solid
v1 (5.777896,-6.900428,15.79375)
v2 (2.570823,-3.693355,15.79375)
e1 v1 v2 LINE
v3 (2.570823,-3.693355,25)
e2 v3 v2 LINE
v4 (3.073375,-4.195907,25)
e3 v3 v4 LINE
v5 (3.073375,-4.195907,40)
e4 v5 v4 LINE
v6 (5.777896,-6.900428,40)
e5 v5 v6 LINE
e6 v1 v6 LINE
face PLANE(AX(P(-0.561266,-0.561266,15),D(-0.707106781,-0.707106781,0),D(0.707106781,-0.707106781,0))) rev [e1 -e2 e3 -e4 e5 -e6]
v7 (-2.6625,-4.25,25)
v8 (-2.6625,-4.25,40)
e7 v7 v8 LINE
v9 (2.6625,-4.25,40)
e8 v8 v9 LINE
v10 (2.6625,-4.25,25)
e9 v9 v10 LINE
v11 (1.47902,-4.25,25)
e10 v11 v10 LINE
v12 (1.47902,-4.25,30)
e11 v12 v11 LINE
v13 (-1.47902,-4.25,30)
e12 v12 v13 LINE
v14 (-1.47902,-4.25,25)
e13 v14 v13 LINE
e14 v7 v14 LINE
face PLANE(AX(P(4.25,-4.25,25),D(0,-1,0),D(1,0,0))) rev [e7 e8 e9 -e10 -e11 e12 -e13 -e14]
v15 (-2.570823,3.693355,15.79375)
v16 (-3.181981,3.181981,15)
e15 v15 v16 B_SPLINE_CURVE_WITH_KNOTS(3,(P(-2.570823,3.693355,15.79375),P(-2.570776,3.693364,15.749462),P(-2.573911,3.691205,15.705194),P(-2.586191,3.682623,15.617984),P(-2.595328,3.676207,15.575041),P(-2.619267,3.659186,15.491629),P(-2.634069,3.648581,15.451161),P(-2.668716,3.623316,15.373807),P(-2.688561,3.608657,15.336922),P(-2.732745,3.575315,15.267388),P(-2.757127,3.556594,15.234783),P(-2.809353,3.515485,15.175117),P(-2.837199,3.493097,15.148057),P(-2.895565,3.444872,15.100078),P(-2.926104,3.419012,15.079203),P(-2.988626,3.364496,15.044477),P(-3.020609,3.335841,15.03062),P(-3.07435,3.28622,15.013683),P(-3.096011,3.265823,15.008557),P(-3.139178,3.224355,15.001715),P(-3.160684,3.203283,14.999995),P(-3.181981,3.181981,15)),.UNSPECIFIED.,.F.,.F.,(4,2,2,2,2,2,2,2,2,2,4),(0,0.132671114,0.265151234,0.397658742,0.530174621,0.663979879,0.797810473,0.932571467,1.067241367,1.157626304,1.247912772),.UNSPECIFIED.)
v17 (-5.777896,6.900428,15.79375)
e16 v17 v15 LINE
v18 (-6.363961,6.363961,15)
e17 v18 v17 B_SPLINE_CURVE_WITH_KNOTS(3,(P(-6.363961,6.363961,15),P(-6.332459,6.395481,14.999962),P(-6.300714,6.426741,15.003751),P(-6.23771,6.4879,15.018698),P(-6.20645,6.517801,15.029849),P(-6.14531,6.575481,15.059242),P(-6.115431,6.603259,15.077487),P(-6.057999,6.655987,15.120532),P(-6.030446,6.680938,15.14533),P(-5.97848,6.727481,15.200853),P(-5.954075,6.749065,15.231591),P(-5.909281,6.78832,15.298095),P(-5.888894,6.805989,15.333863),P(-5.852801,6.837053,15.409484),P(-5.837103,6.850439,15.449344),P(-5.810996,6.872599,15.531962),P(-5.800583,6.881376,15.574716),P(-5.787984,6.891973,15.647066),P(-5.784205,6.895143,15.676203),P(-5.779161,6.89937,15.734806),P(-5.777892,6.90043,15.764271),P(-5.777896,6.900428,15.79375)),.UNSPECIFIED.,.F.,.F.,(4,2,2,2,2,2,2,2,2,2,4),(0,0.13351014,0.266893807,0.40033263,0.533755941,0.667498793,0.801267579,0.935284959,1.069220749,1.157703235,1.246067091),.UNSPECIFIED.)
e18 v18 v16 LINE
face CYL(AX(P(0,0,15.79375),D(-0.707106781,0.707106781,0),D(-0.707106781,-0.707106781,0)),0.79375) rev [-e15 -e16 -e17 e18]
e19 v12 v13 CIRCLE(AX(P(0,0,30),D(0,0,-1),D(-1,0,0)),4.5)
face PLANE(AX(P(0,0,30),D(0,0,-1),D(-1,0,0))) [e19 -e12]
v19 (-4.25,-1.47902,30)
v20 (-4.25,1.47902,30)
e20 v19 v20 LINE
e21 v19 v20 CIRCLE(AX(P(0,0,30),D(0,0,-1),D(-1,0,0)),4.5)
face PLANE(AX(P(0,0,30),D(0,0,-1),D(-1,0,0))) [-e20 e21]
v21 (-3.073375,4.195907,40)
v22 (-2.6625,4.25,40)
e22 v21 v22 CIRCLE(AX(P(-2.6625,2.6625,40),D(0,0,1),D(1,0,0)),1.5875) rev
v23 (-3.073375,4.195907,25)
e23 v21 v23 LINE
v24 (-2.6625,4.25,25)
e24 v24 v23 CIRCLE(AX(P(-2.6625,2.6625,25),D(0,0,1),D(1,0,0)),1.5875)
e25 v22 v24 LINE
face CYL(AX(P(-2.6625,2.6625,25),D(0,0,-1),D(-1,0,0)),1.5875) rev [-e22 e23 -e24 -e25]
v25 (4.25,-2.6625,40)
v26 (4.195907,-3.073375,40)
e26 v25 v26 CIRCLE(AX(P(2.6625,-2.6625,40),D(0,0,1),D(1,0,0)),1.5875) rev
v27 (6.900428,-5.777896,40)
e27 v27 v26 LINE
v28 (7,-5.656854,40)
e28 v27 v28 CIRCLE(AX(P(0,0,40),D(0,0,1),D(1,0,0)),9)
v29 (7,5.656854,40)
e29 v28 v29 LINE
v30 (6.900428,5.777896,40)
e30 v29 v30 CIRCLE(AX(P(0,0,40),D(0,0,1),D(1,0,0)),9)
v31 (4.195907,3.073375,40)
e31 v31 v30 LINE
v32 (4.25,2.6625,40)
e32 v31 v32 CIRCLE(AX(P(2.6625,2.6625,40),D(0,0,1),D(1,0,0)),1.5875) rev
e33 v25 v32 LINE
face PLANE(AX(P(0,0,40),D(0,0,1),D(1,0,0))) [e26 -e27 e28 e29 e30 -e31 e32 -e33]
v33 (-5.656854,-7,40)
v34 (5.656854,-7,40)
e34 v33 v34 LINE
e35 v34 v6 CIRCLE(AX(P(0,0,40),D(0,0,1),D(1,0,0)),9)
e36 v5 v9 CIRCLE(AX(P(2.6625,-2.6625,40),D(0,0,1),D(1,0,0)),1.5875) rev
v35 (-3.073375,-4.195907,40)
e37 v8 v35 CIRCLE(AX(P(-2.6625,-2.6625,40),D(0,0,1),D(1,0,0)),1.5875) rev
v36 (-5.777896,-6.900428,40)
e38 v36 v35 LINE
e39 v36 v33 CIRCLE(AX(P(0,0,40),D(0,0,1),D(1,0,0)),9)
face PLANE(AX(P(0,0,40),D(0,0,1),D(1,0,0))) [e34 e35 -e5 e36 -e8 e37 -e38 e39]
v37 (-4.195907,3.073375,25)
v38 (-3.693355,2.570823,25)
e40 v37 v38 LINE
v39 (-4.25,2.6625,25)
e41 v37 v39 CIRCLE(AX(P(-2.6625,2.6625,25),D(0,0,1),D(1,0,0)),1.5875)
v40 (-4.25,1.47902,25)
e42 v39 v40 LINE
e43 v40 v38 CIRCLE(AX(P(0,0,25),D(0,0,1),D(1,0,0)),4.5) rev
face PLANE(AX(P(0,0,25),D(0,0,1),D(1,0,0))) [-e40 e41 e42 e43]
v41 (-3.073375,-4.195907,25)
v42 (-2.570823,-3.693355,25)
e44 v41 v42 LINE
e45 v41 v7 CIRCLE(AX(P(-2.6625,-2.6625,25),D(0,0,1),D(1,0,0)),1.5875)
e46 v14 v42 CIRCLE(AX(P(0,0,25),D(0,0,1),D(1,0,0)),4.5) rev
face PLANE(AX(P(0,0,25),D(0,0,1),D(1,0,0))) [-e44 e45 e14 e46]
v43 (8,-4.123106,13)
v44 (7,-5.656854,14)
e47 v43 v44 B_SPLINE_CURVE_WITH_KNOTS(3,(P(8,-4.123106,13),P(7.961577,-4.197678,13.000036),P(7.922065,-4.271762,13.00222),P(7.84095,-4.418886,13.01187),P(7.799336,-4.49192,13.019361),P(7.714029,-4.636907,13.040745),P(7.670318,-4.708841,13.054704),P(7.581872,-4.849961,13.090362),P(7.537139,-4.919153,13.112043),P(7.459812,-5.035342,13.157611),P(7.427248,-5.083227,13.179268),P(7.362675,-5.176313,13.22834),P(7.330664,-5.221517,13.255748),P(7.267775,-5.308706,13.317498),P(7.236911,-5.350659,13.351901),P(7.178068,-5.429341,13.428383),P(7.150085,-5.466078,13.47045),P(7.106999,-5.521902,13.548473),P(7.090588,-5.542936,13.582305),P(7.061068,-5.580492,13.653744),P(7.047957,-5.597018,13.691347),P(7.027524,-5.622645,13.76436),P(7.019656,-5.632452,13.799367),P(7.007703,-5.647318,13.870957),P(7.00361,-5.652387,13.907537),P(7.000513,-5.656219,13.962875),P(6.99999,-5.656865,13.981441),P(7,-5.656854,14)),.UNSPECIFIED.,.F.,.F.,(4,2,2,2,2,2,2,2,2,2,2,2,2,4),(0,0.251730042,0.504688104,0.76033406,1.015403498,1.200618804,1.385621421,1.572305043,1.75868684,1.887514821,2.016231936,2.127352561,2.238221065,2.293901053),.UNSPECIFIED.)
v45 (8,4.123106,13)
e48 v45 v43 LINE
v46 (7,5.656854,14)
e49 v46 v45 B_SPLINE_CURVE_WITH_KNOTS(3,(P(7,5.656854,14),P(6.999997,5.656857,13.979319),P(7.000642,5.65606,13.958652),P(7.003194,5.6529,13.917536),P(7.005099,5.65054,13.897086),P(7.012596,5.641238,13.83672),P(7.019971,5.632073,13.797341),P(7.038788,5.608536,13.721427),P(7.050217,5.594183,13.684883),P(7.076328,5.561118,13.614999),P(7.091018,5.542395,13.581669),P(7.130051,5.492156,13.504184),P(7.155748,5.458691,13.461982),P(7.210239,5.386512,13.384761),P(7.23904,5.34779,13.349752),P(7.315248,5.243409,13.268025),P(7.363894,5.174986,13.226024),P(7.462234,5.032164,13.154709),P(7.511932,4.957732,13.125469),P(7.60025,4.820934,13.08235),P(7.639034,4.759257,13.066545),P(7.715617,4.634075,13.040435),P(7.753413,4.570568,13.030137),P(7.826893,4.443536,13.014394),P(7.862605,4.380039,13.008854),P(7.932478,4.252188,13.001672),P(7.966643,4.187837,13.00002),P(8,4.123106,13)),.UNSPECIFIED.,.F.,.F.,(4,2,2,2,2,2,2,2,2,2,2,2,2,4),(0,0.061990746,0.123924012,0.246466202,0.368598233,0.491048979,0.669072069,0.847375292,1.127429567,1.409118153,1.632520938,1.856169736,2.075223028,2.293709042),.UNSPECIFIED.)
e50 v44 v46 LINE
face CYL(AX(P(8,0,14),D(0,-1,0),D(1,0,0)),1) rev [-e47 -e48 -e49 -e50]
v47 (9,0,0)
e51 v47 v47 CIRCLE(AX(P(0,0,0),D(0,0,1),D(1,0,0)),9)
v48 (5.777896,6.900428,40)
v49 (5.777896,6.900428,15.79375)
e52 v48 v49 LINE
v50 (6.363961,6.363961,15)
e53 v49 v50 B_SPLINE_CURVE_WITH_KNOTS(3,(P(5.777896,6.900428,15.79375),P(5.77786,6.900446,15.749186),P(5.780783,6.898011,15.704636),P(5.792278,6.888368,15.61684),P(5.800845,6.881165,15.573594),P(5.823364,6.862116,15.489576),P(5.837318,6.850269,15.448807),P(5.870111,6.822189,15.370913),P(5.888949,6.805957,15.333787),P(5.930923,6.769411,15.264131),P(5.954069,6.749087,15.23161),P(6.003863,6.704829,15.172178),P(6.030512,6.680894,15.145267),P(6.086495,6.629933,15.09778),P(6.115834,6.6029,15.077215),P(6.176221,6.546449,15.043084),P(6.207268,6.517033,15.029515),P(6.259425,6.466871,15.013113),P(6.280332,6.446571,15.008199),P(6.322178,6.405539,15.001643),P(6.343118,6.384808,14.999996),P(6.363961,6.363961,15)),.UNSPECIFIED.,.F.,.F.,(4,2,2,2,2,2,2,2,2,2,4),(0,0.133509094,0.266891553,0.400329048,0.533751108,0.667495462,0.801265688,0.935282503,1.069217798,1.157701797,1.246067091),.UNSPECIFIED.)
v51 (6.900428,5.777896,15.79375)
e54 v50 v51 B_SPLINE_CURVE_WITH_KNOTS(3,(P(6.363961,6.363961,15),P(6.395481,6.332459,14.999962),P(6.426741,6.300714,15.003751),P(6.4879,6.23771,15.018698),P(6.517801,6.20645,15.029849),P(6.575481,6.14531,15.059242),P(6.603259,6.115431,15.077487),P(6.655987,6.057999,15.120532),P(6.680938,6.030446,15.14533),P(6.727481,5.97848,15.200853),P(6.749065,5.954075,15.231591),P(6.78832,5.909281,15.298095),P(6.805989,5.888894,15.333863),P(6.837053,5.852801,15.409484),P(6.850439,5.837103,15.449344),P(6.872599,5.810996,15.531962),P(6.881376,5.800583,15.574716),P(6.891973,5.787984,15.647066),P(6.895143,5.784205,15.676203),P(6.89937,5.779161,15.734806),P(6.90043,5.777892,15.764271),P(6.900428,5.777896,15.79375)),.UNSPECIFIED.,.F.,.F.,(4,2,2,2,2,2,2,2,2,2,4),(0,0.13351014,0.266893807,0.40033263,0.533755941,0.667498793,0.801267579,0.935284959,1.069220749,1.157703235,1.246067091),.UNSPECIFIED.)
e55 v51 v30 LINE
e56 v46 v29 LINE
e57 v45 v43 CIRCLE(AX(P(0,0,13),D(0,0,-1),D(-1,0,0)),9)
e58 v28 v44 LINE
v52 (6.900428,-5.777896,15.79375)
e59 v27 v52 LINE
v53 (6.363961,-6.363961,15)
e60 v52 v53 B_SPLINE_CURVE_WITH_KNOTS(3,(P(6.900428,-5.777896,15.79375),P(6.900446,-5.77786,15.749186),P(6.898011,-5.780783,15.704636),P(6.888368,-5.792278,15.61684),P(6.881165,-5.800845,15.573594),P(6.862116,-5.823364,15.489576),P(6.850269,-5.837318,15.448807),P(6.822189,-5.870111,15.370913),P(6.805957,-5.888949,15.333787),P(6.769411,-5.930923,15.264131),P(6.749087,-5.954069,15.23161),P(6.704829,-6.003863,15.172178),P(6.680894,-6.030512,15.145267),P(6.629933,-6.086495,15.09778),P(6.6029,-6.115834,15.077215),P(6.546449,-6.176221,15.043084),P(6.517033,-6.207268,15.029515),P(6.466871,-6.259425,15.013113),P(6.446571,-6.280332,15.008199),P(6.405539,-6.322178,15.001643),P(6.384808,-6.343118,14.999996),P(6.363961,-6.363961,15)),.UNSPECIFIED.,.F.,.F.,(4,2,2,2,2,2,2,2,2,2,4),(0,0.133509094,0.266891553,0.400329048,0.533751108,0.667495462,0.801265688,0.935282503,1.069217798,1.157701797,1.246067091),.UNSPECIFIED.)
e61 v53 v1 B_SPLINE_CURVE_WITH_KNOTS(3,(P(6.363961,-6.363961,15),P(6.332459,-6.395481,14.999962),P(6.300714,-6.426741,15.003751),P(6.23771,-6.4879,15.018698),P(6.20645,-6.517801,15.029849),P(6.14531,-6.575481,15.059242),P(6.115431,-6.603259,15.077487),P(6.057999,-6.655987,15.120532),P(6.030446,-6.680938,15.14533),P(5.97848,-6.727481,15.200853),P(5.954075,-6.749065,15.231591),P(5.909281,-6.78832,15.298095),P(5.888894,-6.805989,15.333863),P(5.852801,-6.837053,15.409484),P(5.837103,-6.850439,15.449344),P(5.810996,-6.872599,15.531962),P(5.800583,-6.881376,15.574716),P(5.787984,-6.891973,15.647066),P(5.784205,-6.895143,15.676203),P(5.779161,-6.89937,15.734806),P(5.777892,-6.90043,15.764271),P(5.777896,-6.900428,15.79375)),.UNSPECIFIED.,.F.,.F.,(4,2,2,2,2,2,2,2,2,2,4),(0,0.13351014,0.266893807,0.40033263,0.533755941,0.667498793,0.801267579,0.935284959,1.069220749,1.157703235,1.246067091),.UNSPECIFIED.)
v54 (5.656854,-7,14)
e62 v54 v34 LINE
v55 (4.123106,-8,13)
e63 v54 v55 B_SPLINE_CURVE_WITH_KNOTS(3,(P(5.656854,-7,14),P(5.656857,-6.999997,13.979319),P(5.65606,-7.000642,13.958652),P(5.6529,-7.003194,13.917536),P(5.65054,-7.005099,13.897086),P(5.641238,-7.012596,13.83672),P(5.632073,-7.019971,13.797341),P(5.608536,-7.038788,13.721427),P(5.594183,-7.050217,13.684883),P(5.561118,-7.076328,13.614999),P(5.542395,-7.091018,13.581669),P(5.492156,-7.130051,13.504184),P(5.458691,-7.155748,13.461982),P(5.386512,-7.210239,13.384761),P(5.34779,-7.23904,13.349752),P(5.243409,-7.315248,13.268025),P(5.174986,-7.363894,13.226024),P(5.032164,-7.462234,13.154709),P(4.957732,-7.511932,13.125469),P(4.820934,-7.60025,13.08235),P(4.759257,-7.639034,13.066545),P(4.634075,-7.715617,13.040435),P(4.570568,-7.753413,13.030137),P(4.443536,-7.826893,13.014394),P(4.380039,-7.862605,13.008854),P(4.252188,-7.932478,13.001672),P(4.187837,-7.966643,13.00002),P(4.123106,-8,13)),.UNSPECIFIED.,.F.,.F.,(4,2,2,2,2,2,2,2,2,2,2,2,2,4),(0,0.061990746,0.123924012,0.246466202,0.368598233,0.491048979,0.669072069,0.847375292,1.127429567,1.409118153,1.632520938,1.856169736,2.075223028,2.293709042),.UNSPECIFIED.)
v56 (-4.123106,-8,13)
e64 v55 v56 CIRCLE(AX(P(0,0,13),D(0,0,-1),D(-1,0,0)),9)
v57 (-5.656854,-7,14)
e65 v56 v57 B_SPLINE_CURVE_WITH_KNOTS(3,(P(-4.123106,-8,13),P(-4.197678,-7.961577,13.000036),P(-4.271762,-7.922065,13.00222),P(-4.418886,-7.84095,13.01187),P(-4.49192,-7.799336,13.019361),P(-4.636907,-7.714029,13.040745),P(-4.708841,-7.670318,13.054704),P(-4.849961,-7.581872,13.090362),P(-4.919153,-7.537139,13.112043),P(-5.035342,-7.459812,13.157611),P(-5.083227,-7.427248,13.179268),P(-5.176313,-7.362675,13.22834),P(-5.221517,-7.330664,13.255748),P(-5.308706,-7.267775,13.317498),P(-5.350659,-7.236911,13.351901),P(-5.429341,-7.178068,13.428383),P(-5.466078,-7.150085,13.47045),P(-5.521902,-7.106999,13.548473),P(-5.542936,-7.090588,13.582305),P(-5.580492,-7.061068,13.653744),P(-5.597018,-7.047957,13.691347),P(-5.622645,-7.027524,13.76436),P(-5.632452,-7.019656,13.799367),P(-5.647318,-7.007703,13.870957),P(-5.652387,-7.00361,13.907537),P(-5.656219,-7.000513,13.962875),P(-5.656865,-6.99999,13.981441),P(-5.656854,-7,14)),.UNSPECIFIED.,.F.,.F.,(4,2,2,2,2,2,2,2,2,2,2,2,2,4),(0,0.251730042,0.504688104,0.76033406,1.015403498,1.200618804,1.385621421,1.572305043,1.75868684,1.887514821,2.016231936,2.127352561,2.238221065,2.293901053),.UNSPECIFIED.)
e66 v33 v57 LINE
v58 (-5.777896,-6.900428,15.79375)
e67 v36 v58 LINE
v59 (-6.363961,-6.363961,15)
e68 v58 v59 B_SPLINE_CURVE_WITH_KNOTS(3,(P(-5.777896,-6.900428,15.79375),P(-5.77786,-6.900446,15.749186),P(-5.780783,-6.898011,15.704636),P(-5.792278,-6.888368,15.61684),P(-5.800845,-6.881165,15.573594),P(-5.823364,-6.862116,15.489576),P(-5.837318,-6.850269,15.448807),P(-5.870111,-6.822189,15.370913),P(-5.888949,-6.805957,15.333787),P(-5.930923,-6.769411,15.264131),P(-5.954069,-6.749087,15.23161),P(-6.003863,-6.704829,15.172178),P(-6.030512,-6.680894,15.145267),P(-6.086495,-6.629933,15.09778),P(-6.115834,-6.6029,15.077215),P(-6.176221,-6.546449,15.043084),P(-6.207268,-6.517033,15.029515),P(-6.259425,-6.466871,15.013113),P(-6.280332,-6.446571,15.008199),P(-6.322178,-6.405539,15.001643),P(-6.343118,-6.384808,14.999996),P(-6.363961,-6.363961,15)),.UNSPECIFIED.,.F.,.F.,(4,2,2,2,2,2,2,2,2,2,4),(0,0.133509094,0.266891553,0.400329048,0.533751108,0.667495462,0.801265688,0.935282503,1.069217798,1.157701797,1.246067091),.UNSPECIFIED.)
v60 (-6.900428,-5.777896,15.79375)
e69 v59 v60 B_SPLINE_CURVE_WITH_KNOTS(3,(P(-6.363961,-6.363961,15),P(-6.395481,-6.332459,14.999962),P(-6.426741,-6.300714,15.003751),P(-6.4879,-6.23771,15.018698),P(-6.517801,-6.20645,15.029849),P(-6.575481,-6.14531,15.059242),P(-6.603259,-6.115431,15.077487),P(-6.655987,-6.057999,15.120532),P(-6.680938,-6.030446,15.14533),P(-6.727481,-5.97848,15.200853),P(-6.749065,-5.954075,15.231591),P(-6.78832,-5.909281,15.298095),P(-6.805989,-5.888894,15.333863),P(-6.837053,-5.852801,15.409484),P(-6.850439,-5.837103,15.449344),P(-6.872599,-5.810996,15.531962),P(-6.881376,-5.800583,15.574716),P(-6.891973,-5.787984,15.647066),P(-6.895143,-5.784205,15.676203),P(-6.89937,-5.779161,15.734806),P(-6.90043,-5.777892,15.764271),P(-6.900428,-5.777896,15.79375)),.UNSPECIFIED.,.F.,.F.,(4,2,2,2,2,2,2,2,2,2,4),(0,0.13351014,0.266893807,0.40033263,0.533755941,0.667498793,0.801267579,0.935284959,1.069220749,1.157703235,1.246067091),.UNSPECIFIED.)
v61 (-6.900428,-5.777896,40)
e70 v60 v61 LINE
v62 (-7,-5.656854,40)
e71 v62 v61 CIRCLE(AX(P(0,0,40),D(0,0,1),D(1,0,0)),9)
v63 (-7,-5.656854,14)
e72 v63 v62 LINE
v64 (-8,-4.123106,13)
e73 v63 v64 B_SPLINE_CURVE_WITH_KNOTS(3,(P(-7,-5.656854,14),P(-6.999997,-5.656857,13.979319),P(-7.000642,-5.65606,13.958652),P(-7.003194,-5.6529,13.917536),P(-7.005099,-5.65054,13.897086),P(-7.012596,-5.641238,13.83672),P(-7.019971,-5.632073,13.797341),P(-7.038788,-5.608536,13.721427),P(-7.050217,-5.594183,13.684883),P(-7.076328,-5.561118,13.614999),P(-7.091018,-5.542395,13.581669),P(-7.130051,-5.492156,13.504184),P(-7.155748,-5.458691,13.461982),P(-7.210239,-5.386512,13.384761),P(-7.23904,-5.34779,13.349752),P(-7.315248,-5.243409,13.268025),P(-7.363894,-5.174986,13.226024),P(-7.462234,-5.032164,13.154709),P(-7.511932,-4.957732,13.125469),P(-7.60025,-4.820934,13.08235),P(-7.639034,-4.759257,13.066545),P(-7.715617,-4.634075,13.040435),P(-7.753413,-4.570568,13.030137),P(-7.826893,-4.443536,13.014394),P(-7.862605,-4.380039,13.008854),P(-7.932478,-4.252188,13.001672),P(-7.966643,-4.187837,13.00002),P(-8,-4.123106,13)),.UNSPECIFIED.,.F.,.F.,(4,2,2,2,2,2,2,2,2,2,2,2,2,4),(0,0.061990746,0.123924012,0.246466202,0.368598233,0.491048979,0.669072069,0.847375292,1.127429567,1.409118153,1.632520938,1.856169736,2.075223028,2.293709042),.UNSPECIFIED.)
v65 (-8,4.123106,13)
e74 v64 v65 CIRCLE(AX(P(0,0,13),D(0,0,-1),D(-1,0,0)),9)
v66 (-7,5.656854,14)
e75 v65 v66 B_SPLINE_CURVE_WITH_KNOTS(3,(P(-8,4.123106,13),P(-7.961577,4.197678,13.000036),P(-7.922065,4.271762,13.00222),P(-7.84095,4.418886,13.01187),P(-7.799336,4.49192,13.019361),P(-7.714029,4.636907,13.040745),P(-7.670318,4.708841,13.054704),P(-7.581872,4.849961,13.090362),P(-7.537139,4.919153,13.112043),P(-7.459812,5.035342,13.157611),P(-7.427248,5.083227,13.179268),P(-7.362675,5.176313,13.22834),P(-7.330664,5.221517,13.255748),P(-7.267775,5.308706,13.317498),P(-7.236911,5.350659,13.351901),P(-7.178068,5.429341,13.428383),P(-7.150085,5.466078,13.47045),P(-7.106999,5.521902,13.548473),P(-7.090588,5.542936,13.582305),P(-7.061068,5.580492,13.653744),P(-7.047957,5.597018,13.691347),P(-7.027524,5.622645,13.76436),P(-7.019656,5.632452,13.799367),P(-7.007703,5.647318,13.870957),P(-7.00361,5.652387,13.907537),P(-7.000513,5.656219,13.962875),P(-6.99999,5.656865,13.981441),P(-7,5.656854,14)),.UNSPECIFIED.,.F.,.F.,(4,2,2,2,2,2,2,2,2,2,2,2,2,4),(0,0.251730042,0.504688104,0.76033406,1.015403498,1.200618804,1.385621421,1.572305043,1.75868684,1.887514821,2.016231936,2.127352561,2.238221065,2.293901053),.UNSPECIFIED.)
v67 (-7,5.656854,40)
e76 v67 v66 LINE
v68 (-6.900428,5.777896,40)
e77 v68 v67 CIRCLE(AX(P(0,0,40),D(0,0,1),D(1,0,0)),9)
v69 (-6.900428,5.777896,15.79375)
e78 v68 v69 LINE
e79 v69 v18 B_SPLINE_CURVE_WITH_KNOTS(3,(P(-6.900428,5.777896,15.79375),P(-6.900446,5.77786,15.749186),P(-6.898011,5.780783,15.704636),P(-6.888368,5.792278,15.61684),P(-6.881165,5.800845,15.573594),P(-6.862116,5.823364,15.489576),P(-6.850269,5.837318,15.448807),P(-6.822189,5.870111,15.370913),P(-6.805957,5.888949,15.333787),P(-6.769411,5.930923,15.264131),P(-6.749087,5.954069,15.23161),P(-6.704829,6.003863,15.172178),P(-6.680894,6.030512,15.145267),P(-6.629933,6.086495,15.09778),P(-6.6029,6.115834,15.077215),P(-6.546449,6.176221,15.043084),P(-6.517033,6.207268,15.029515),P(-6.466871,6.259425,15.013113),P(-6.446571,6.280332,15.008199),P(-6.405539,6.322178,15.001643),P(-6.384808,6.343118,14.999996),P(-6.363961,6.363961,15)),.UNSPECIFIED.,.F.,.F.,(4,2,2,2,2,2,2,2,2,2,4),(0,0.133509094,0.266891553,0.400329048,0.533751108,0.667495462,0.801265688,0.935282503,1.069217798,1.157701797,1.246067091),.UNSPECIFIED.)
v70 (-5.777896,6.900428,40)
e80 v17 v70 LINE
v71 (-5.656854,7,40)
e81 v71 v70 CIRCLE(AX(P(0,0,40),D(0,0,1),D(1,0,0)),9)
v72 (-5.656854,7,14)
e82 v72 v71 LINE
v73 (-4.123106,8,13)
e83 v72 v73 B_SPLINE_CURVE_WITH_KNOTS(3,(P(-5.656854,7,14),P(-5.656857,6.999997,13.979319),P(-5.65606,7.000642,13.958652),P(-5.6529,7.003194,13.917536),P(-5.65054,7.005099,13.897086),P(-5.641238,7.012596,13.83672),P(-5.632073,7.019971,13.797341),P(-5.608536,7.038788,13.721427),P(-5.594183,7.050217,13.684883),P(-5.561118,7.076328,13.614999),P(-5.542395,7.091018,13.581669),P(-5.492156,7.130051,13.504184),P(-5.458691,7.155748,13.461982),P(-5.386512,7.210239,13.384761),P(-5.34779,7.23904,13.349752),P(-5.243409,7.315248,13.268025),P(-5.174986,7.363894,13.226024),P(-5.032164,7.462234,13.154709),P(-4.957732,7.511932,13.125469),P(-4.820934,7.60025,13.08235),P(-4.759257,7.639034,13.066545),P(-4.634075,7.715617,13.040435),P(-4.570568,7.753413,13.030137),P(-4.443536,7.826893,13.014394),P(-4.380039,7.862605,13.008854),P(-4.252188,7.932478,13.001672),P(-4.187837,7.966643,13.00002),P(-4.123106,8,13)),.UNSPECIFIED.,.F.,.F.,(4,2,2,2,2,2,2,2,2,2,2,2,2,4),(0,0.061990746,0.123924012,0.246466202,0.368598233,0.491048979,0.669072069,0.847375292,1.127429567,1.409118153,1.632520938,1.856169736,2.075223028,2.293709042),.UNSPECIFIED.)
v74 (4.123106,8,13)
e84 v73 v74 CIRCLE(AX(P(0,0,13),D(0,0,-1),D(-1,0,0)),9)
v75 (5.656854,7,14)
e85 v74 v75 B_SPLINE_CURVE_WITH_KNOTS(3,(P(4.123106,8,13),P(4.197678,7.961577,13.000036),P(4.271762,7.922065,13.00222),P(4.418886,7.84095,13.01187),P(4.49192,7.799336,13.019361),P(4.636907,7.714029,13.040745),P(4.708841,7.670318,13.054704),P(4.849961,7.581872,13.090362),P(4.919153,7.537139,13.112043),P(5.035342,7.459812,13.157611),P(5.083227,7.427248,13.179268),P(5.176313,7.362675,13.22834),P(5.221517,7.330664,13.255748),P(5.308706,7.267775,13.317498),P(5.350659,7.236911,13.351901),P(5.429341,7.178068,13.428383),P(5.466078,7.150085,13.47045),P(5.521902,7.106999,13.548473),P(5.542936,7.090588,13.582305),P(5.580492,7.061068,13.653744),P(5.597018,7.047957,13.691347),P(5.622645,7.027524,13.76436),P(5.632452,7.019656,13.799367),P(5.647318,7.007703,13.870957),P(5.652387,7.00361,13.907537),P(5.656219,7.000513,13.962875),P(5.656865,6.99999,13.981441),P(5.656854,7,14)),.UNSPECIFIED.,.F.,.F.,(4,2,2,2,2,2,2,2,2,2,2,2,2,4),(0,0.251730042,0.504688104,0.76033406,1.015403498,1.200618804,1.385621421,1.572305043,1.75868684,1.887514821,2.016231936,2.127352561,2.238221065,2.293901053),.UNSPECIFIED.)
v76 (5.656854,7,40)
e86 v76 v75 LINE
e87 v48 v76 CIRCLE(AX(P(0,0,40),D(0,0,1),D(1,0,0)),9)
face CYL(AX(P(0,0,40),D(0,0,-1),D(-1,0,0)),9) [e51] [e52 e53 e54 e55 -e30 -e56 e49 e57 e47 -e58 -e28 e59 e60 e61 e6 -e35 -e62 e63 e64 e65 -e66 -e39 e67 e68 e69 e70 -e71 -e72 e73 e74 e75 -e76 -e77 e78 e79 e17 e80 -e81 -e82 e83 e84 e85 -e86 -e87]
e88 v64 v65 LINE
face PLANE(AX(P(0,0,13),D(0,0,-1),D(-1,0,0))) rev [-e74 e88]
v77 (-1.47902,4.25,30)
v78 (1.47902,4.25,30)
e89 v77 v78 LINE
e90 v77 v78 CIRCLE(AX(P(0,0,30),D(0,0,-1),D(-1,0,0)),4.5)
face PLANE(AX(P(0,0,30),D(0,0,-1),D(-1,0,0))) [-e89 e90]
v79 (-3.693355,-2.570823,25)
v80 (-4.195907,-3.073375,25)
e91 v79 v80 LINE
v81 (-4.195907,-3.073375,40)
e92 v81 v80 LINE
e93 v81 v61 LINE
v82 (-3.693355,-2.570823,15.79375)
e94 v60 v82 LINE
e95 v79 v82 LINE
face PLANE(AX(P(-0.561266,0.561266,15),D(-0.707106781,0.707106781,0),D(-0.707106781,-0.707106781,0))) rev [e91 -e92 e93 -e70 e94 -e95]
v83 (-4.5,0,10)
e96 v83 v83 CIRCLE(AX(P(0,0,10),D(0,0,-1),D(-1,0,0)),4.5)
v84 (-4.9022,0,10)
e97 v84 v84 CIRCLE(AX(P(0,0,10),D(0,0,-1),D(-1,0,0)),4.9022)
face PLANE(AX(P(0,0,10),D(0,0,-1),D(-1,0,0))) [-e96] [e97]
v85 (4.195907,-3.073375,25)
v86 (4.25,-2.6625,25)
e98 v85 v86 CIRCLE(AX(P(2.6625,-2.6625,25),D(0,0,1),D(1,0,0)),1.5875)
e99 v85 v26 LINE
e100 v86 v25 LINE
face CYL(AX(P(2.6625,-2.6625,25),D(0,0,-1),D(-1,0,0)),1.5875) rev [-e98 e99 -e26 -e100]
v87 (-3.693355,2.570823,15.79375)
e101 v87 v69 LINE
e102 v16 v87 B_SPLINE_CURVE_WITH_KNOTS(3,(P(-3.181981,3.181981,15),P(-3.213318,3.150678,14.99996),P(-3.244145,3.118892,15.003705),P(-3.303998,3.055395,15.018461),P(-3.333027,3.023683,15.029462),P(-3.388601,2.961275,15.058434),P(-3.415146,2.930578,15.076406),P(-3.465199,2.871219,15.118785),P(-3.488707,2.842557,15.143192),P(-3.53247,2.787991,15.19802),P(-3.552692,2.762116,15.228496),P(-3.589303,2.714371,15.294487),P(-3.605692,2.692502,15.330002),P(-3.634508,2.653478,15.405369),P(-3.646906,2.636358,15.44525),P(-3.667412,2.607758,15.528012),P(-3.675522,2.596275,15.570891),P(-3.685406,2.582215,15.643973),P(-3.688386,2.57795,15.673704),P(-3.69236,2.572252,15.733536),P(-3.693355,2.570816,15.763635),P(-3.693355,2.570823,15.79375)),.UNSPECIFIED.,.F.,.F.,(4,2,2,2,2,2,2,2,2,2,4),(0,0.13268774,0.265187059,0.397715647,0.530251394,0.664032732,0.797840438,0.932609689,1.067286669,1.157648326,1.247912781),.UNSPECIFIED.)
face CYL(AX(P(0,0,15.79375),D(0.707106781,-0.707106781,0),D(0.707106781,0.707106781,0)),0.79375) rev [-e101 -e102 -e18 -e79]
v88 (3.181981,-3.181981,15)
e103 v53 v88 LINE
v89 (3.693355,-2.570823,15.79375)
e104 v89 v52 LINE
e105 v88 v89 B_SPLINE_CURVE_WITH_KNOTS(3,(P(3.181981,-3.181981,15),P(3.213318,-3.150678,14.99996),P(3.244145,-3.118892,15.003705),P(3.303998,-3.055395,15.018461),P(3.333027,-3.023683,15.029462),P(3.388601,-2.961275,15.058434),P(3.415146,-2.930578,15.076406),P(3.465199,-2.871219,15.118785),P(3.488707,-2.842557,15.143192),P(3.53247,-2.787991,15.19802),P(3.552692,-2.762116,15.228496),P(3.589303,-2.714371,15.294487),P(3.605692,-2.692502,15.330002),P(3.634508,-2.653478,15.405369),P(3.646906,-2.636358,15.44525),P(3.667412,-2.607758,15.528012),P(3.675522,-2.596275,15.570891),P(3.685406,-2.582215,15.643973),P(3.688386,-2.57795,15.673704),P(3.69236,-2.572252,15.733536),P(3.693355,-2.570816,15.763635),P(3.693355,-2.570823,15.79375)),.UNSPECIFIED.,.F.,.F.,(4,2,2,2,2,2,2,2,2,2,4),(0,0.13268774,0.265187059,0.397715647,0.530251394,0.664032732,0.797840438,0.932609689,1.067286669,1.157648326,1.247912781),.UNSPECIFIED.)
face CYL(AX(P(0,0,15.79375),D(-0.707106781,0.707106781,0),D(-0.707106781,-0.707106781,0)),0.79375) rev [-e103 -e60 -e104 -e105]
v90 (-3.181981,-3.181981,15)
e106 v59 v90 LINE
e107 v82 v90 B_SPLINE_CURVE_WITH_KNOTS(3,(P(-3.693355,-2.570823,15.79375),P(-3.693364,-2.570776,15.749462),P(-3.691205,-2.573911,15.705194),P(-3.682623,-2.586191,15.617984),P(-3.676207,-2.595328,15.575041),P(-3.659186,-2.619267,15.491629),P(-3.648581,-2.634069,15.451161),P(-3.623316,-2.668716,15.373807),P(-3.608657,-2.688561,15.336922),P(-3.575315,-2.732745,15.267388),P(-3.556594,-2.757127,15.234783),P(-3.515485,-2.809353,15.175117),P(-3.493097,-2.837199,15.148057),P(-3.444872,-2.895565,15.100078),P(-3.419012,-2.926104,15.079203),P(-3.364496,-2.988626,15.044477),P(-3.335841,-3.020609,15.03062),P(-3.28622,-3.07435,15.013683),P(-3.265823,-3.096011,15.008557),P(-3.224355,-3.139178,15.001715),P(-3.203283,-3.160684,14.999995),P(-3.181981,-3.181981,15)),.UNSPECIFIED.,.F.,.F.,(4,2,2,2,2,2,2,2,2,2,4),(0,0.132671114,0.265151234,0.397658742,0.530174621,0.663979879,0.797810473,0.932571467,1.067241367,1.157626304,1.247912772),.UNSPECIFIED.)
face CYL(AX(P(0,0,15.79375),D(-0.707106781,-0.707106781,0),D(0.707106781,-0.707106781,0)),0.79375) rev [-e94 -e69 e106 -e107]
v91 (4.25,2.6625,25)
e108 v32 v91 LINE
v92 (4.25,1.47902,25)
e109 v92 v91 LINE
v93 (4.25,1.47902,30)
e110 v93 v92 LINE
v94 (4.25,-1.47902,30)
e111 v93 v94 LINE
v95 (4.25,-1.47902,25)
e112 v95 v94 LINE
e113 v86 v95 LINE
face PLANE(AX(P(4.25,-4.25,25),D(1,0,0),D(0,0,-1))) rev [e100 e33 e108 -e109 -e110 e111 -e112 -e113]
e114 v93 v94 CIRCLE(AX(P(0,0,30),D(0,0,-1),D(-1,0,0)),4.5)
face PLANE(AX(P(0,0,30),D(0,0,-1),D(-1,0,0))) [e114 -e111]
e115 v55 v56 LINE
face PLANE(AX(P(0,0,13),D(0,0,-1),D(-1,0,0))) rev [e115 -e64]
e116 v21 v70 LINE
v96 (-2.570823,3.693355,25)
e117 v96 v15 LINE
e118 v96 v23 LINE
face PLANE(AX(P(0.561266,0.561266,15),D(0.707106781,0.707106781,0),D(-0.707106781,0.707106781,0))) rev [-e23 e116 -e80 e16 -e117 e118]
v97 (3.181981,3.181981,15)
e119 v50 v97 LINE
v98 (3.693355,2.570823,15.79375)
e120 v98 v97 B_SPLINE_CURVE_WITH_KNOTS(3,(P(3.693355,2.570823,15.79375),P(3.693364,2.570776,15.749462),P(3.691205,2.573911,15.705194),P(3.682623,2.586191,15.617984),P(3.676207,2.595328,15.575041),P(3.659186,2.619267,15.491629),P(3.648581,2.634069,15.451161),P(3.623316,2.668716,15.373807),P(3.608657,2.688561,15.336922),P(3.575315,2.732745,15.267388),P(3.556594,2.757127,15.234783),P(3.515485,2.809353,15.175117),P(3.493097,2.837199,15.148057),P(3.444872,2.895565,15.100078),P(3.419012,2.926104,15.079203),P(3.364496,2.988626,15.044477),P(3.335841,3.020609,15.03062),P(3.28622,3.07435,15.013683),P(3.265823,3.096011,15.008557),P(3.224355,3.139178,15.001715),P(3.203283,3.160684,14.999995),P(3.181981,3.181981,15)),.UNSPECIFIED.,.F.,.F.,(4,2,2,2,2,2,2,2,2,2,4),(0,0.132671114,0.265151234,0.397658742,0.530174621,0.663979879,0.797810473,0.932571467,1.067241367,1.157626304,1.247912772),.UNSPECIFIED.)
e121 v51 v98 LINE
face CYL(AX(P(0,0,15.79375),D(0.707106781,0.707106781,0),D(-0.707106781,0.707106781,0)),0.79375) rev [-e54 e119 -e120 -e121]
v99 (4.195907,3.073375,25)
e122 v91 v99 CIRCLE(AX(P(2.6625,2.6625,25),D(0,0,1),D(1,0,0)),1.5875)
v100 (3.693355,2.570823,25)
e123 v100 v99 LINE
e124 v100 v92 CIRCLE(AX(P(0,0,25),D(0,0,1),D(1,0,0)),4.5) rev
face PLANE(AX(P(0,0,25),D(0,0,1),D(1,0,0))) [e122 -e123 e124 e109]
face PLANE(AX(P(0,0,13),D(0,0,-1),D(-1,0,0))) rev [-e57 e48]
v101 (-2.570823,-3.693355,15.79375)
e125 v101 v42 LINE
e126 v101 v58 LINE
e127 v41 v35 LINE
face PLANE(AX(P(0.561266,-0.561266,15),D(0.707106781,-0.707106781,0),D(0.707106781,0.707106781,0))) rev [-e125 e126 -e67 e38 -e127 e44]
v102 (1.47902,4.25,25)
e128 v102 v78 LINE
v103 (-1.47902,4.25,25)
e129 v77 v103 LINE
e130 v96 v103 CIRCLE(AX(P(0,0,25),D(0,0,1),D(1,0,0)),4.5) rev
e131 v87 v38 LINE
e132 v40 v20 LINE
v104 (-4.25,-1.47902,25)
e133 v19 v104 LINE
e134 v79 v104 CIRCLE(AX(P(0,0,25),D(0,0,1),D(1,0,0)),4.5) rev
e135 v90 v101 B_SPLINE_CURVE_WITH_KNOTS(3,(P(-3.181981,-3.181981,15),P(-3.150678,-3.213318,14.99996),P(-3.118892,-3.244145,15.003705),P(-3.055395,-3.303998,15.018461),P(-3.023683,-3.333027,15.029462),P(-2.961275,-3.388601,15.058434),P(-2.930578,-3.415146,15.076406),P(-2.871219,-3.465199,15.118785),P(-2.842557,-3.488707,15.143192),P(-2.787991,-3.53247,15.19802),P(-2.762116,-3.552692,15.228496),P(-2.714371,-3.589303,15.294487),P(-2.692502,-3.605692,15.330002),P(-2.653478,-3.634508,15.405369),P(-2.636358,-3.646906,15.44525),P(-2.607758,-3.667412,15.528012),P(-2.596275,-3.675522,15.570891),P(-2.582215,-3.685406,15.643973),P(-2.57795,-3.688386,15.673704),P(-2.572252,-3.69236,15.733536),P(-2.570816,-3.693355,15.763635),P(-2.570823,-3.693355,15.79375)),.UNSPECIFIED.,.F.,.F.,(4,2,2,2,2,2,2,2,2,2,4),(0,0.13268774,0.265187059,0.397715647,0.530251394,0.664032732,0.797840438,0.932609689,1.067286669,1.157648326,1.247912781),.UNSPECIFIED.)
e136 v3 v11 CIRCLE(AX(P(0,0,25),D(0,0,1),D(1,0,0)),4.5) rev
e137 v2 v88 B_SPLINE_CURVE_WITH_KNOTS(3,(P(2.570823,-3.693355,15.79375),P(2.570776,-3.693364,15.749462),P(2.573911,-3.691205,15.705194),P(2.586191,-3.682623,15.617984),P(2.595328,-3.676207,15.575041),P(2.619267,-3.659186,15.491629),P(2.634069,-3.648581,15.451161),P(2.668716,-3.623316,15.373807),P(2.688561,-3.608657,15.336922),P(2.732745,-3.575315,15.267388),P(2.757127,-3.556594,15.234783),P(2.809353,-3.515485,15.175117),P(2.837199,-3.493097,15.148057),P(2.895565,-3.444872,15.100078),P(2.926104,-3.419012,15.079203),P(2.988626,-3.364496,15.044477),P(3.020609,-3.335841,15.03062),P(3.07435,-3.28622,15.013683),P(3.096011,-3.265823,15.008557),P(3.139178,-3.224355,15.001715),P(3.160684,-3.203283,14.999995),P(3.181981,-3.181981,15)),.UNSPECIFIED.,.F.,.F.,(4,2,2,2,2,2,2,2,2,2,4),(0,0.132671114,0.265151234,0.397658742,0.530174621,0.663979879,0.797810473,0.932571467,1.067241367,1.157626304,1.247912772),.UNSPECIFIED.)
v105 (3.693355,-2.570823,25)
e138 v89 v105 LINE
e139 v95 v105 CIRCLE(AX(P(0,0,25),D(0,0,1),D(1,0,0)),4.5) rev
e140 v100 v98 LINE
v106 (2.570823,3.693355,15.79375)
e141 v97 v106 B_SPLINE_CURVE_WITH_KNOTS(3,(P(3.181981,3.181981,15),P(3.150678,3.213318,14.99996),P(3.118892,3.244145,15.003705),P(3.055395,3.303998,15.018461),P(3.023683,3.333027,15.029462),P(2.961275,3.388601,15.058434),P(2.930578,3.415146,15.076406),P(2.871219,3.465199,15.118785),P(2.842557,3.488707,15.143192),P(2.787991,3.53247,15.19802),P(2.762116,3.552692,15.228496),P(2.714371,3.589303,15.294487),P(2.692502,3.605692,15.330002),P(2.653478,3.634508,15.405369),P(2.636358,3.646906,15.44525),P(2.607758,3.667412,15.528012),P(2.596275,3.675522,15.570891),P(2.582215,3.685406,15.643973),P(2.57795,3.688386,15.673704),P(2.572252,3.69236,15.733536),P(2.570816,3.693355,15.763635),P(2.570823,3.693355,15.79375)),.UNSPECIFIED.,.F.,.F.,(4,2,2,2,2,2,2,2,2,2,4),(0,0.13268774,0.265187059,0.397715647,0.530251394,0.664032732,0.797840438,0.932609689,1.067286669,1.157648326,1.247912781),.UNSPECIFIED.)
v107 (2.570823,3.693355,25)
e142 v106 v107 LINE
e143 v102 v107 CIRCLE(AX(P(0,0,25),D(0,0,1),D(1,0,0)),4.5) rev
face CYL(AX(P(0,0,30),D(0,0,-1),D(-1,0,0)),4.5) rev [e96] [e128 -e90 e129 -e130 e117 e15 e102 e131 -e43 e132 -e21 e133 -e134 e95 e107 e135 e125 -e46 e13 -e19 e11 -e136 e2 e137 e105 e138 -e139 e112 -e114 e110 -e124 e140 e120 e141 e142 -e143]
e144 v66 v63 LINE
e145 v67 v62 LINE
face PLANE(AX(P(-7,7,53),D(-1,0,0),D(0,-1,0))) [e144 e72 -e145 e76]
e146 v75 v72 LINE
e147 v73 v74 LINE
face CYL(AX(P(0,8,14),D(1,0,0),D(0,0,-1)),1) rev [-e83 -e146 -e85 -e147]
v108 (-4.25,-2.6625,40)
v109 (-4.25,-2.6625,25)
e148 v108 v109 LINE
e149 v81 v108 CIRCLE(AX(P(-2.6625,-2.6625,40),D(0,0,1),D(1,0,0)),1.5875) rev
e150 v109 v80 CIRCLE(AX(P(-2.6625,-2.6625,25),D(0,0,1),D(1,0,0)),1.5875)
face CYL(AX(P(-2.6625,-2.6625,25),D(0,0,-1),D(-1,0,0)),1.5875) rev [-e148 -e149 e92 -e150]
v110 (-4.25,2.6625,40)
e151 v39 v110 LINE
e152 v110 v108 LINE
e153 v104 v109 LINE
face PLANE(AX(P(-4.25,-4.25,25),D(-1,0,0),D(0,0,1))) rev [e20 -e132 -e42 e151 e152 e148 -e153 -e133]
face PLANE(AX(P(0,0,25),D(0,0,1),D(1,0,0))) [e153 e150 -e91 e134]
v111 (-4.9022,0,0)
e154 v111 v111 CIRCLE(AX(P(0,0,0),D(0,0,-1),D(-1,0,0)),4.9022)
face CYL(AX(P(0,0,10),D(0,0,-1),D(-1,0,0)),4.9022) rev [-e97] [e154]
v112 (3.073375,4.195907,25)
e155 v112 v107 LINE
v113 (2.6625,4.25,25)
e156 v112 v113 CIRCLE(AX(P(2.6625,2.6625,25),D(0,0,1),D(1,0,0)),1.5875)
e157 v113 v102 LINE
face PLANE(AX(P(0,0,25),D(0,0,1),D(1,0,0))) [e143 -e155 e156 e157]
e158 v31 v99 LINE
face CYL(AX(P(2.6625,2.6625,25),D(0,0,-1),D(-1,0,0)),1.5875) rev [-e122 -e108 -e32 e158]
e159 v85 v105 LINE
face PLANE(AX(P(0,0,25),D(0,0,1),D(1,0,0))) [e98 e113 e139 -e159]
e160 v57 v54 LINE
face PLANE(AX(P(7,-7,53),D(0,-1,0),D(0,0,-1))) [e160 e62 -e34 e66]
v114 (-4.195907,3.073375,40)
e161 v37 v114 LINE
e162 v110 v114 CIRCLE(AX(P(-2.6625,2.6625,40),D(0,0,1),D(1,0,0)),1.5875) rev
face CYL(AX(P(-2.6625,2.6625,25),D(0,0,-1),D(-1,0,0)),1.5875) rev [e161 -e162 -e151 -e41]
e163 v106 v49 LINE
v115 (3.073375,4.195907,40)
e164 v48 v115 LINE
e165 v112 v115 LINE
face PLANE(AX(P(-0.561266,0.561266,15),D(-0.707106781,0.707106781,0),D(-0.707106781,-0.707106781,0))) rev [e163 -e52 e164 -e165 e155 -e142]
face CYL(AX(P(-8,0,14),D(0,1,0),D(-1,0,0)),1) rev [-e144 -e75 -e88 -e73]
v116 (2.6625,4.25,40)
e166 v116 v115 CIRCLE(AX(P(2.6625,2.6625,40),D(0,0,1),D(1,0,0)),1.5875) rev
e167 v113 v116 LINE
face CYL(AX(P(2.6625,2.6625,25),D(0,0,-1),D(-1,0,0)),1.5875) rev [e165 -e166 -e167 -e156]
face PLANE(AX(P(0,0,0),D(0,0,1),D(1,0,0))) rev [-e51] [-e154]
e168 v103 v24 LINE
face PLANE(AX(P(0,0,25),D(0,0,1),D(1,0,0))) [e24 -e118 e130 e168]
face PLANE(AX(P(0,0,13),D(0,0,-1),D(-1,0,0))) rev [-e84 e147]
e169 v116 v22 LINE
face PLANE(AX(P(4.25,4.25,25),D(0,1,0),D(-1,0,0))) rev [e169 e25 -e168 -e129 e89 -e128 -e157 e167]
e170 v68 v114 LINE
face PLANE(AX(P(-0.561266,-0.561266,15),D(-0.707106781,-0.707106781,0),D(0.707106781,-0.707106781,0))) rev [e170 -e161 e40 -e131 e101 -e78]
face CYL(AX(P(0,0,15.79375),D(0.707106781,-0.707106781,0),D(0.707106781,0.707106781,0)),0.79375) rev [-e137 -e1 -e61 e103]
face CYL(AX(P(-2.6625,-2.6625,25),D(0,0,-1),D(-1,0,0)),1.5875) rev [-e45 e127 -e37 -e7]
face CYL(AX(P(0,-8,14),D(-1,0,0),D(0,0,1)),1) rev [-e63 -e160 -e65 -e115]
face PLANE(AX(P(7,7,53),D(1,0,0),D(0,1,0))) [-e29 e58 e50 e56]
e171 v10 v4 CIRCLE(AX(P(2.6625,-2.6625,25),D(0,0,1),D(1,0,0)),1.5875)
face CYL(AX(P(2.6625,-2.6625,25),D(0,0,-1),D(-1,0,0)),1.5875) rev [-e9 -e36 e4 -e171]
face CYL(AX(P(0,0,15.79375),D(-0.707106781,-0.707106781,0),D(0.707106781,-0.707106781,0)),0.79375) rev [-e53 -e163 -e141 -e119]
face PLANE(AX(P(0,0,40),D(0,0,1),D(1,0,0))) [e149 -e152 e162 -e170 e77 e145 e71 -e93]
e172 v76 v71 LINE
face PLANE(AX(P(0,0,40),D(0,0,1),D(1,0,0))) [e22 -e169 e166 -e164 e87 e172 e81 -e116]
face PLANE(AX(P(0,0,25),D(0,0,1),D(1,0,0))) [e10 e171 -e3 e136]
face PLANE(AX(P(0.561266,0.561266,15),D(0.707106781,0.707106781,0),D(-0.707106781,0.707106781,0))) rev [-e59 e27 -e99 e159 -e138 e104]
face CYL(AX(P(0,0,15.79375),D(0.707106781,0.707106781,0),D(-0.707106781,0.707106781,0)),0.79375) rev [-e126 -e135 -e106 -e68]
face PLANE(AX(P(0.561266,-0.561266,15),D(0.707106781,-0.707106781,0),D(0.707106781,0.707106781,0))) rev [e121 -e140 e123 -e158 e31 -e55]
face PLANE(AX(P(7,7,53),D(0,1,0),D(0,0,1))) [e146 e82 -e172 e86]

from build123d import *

# Parameters (mm, degrees)
SKETCH1_R                = 9
SKETCH1_R_2              = 4.25
BOSS_EXTRUDE1_DEPTH      = 40
SKETCH2_R                = 4.9022
CUT_EXTRUDE1_DEPTH       = 10
SKETCH3_R                = 14.693864286
SKETCH3_W                = 14
SKETCH3_H                = 14
CUT_EXTRUDE2_DEPTH       = 40
SKETCH5_R                = 4.5
CUT_EXTRUDE4_DEPTH       = 30
SKETCH14_W               = 8.5
SKETCH14_H               = 8.5
CUT_EXTRUDE10_DEPTH      = 15
FILLET5_R                = 1.5875
CUT_EXTRUDE8_DEPTH       = 25
FILLET6_R                = 0.79375
CIRPATTERN2_COUNT        = 4
FILLET6_OF_CIRPATTERN2_R = 0.79375
FILLET4_R                = 1


with BuildPart() as part:
    # Sketch1 → Boss-Extrude1 (new body)
    with BuildSketch(Plane.XY):
        Circle(SKETCH1_R)
        Circle(SKETCH1_R_2, mode=Mode.SUBTRACT)
    extrude(amount=BOSS_EXTRUDE1_DEPTH)

    # Sketch2 → Cut-Extrude1 (cut)
    with BuildSketch(Plane(origin=(0, 0, 0), x_dir=(-1, 0, 0), z_dir=(0, 0, -1))):
        Circle(SKETCH2_R)
    extrude(amount=-CUT_EXTRUDE1_DEPTH, mode=Mode.SUBTRACT)

    # Sketch3 → Cut-Extrude2 (cut)
    with BuildSketch(Plane(origin=(0, 0, 13), x_dir=(-1, 0, 0), z_dir=(0, 0, -1))):
        Circle(SKETCH3_R)
        Rectangle(SKETCH3_W, SKETCH3_H, mode=Mode.SUBTRACT)
    extrude(amount=-CUT_EXTRUDE2_DEPTH, mode=Mode.SUBTRACT)

    # Sketch5 → Cut-Extrude4 (cut)
    with BuildSketch(Plane(origin=(0, 0, 0), x_dir=(-1, 0, 0), z_dir=(0, 0, -1))):
        Circle(SKETCH5_R)
    extrude(amount=-CUT_EXTRUDE4_DEPTH, mode=Mode.SUBTRACT)

    # Sketch14 → Cut-Extrude10 (cut)
    with BuildSketch(Plane.XY.offset(40)):
        Rectangle(SKETCH14_W, SKETCH14_H)
    extrude(amount=-CUT_EXTRUDE10_DEPTH, mode=Mode.SUBTRACT)

    # Fillet5
    fillet5_edges = [part.edges().sort_by_distance(p)[0] for p in [
        (-4.25, -4.25, 32.5),
        (-4.25, 4.25, 32.5),
        (4.25, 4.25, 32.5),
        (4.25, -4.25, 32.5),
    ]]
    fillet(fillet5_edges, radius=FILLET5_R)

    # Sketch11 → Cut-Extrude8 (cut)
    with BuildSketch(Plane.XY.offset(40)):
        with BuildLine():
            Line((-0.561266008, -0.561266008), (-7.411347572, 6.288815557))
            ThreePointArc((-7.411347572, 6.288815557), (-7.411347572, 7.411347572), (-6.288815557, 7.411347572))
            Line((-6.288815557, 7.411347572), (0.561266008, 0.561266008))
            ThreePointArc((0.561266008, 0.561266008), (0.561266008, -0.561266008), (-0.561266008, -0.561266008))
        make_face()
    cut_extrude8 = extrude(amount=-CUT_EXTRUDE8_DEPTH, mode=Mode.SUBTRACT)

    # Fillet6
    fillet6_edges = [part.edges().sort_by_distance(p)[0] for p in [
        (-4.174359631, 5.296891646, 15),
        (-5.296891646, 4.174359631, 15),
    ]]
    fillet(fillet6_edges, radius=FILLET6_R - 0.0001)  # a hair under: the kernel refuses the full size

    # CirPattern2: Cut-Extrude8 ×4 about axis
    cirpattern2_axis = Axis((0, 0, 0), (0, 0, 1))
    for i in range(1, CIRPATTERN2_COUNT):
        add(cut_extrude8.rotate(cirpattern2_axis, i * 360 / CIRPATTERN2_COUNT), mode=Mode.SUBTRACT)

    # Fillet6 of CirPattern2
    fillet6_of_cirpattern2_edges = [part.edges().sort_by_distance(p)[0] for p in [
        (-5.296891646, -4.174359631, 15),
        (-4.174359631, -5.296891646, 15),
        (4.174359631, -5.296891646, 15),
        (5.296891646, -4.174359631, 15),
        (5.296891646, 4.174359631, 15),
        (4.174359631, 5.296891646, 15),
    ]]
    fillet(fillet6_of_cirpattern2_edges, radius=FILLET6_OF_CIRPATTERN2_R - 0.0001)  # a hair under: the kernel refuses the full size

    # Fillet4
    fillet4_edges = [part.edges().sort_by_distance(p)[0] for p in [
        (-7, 0, 13),
        (0, -7, 13),
        (7, 0, 13),
        (0, 7, 13),
    ]]
    fillet(fillet4_edges, radius=FILLET4_R)


solid = part.part
